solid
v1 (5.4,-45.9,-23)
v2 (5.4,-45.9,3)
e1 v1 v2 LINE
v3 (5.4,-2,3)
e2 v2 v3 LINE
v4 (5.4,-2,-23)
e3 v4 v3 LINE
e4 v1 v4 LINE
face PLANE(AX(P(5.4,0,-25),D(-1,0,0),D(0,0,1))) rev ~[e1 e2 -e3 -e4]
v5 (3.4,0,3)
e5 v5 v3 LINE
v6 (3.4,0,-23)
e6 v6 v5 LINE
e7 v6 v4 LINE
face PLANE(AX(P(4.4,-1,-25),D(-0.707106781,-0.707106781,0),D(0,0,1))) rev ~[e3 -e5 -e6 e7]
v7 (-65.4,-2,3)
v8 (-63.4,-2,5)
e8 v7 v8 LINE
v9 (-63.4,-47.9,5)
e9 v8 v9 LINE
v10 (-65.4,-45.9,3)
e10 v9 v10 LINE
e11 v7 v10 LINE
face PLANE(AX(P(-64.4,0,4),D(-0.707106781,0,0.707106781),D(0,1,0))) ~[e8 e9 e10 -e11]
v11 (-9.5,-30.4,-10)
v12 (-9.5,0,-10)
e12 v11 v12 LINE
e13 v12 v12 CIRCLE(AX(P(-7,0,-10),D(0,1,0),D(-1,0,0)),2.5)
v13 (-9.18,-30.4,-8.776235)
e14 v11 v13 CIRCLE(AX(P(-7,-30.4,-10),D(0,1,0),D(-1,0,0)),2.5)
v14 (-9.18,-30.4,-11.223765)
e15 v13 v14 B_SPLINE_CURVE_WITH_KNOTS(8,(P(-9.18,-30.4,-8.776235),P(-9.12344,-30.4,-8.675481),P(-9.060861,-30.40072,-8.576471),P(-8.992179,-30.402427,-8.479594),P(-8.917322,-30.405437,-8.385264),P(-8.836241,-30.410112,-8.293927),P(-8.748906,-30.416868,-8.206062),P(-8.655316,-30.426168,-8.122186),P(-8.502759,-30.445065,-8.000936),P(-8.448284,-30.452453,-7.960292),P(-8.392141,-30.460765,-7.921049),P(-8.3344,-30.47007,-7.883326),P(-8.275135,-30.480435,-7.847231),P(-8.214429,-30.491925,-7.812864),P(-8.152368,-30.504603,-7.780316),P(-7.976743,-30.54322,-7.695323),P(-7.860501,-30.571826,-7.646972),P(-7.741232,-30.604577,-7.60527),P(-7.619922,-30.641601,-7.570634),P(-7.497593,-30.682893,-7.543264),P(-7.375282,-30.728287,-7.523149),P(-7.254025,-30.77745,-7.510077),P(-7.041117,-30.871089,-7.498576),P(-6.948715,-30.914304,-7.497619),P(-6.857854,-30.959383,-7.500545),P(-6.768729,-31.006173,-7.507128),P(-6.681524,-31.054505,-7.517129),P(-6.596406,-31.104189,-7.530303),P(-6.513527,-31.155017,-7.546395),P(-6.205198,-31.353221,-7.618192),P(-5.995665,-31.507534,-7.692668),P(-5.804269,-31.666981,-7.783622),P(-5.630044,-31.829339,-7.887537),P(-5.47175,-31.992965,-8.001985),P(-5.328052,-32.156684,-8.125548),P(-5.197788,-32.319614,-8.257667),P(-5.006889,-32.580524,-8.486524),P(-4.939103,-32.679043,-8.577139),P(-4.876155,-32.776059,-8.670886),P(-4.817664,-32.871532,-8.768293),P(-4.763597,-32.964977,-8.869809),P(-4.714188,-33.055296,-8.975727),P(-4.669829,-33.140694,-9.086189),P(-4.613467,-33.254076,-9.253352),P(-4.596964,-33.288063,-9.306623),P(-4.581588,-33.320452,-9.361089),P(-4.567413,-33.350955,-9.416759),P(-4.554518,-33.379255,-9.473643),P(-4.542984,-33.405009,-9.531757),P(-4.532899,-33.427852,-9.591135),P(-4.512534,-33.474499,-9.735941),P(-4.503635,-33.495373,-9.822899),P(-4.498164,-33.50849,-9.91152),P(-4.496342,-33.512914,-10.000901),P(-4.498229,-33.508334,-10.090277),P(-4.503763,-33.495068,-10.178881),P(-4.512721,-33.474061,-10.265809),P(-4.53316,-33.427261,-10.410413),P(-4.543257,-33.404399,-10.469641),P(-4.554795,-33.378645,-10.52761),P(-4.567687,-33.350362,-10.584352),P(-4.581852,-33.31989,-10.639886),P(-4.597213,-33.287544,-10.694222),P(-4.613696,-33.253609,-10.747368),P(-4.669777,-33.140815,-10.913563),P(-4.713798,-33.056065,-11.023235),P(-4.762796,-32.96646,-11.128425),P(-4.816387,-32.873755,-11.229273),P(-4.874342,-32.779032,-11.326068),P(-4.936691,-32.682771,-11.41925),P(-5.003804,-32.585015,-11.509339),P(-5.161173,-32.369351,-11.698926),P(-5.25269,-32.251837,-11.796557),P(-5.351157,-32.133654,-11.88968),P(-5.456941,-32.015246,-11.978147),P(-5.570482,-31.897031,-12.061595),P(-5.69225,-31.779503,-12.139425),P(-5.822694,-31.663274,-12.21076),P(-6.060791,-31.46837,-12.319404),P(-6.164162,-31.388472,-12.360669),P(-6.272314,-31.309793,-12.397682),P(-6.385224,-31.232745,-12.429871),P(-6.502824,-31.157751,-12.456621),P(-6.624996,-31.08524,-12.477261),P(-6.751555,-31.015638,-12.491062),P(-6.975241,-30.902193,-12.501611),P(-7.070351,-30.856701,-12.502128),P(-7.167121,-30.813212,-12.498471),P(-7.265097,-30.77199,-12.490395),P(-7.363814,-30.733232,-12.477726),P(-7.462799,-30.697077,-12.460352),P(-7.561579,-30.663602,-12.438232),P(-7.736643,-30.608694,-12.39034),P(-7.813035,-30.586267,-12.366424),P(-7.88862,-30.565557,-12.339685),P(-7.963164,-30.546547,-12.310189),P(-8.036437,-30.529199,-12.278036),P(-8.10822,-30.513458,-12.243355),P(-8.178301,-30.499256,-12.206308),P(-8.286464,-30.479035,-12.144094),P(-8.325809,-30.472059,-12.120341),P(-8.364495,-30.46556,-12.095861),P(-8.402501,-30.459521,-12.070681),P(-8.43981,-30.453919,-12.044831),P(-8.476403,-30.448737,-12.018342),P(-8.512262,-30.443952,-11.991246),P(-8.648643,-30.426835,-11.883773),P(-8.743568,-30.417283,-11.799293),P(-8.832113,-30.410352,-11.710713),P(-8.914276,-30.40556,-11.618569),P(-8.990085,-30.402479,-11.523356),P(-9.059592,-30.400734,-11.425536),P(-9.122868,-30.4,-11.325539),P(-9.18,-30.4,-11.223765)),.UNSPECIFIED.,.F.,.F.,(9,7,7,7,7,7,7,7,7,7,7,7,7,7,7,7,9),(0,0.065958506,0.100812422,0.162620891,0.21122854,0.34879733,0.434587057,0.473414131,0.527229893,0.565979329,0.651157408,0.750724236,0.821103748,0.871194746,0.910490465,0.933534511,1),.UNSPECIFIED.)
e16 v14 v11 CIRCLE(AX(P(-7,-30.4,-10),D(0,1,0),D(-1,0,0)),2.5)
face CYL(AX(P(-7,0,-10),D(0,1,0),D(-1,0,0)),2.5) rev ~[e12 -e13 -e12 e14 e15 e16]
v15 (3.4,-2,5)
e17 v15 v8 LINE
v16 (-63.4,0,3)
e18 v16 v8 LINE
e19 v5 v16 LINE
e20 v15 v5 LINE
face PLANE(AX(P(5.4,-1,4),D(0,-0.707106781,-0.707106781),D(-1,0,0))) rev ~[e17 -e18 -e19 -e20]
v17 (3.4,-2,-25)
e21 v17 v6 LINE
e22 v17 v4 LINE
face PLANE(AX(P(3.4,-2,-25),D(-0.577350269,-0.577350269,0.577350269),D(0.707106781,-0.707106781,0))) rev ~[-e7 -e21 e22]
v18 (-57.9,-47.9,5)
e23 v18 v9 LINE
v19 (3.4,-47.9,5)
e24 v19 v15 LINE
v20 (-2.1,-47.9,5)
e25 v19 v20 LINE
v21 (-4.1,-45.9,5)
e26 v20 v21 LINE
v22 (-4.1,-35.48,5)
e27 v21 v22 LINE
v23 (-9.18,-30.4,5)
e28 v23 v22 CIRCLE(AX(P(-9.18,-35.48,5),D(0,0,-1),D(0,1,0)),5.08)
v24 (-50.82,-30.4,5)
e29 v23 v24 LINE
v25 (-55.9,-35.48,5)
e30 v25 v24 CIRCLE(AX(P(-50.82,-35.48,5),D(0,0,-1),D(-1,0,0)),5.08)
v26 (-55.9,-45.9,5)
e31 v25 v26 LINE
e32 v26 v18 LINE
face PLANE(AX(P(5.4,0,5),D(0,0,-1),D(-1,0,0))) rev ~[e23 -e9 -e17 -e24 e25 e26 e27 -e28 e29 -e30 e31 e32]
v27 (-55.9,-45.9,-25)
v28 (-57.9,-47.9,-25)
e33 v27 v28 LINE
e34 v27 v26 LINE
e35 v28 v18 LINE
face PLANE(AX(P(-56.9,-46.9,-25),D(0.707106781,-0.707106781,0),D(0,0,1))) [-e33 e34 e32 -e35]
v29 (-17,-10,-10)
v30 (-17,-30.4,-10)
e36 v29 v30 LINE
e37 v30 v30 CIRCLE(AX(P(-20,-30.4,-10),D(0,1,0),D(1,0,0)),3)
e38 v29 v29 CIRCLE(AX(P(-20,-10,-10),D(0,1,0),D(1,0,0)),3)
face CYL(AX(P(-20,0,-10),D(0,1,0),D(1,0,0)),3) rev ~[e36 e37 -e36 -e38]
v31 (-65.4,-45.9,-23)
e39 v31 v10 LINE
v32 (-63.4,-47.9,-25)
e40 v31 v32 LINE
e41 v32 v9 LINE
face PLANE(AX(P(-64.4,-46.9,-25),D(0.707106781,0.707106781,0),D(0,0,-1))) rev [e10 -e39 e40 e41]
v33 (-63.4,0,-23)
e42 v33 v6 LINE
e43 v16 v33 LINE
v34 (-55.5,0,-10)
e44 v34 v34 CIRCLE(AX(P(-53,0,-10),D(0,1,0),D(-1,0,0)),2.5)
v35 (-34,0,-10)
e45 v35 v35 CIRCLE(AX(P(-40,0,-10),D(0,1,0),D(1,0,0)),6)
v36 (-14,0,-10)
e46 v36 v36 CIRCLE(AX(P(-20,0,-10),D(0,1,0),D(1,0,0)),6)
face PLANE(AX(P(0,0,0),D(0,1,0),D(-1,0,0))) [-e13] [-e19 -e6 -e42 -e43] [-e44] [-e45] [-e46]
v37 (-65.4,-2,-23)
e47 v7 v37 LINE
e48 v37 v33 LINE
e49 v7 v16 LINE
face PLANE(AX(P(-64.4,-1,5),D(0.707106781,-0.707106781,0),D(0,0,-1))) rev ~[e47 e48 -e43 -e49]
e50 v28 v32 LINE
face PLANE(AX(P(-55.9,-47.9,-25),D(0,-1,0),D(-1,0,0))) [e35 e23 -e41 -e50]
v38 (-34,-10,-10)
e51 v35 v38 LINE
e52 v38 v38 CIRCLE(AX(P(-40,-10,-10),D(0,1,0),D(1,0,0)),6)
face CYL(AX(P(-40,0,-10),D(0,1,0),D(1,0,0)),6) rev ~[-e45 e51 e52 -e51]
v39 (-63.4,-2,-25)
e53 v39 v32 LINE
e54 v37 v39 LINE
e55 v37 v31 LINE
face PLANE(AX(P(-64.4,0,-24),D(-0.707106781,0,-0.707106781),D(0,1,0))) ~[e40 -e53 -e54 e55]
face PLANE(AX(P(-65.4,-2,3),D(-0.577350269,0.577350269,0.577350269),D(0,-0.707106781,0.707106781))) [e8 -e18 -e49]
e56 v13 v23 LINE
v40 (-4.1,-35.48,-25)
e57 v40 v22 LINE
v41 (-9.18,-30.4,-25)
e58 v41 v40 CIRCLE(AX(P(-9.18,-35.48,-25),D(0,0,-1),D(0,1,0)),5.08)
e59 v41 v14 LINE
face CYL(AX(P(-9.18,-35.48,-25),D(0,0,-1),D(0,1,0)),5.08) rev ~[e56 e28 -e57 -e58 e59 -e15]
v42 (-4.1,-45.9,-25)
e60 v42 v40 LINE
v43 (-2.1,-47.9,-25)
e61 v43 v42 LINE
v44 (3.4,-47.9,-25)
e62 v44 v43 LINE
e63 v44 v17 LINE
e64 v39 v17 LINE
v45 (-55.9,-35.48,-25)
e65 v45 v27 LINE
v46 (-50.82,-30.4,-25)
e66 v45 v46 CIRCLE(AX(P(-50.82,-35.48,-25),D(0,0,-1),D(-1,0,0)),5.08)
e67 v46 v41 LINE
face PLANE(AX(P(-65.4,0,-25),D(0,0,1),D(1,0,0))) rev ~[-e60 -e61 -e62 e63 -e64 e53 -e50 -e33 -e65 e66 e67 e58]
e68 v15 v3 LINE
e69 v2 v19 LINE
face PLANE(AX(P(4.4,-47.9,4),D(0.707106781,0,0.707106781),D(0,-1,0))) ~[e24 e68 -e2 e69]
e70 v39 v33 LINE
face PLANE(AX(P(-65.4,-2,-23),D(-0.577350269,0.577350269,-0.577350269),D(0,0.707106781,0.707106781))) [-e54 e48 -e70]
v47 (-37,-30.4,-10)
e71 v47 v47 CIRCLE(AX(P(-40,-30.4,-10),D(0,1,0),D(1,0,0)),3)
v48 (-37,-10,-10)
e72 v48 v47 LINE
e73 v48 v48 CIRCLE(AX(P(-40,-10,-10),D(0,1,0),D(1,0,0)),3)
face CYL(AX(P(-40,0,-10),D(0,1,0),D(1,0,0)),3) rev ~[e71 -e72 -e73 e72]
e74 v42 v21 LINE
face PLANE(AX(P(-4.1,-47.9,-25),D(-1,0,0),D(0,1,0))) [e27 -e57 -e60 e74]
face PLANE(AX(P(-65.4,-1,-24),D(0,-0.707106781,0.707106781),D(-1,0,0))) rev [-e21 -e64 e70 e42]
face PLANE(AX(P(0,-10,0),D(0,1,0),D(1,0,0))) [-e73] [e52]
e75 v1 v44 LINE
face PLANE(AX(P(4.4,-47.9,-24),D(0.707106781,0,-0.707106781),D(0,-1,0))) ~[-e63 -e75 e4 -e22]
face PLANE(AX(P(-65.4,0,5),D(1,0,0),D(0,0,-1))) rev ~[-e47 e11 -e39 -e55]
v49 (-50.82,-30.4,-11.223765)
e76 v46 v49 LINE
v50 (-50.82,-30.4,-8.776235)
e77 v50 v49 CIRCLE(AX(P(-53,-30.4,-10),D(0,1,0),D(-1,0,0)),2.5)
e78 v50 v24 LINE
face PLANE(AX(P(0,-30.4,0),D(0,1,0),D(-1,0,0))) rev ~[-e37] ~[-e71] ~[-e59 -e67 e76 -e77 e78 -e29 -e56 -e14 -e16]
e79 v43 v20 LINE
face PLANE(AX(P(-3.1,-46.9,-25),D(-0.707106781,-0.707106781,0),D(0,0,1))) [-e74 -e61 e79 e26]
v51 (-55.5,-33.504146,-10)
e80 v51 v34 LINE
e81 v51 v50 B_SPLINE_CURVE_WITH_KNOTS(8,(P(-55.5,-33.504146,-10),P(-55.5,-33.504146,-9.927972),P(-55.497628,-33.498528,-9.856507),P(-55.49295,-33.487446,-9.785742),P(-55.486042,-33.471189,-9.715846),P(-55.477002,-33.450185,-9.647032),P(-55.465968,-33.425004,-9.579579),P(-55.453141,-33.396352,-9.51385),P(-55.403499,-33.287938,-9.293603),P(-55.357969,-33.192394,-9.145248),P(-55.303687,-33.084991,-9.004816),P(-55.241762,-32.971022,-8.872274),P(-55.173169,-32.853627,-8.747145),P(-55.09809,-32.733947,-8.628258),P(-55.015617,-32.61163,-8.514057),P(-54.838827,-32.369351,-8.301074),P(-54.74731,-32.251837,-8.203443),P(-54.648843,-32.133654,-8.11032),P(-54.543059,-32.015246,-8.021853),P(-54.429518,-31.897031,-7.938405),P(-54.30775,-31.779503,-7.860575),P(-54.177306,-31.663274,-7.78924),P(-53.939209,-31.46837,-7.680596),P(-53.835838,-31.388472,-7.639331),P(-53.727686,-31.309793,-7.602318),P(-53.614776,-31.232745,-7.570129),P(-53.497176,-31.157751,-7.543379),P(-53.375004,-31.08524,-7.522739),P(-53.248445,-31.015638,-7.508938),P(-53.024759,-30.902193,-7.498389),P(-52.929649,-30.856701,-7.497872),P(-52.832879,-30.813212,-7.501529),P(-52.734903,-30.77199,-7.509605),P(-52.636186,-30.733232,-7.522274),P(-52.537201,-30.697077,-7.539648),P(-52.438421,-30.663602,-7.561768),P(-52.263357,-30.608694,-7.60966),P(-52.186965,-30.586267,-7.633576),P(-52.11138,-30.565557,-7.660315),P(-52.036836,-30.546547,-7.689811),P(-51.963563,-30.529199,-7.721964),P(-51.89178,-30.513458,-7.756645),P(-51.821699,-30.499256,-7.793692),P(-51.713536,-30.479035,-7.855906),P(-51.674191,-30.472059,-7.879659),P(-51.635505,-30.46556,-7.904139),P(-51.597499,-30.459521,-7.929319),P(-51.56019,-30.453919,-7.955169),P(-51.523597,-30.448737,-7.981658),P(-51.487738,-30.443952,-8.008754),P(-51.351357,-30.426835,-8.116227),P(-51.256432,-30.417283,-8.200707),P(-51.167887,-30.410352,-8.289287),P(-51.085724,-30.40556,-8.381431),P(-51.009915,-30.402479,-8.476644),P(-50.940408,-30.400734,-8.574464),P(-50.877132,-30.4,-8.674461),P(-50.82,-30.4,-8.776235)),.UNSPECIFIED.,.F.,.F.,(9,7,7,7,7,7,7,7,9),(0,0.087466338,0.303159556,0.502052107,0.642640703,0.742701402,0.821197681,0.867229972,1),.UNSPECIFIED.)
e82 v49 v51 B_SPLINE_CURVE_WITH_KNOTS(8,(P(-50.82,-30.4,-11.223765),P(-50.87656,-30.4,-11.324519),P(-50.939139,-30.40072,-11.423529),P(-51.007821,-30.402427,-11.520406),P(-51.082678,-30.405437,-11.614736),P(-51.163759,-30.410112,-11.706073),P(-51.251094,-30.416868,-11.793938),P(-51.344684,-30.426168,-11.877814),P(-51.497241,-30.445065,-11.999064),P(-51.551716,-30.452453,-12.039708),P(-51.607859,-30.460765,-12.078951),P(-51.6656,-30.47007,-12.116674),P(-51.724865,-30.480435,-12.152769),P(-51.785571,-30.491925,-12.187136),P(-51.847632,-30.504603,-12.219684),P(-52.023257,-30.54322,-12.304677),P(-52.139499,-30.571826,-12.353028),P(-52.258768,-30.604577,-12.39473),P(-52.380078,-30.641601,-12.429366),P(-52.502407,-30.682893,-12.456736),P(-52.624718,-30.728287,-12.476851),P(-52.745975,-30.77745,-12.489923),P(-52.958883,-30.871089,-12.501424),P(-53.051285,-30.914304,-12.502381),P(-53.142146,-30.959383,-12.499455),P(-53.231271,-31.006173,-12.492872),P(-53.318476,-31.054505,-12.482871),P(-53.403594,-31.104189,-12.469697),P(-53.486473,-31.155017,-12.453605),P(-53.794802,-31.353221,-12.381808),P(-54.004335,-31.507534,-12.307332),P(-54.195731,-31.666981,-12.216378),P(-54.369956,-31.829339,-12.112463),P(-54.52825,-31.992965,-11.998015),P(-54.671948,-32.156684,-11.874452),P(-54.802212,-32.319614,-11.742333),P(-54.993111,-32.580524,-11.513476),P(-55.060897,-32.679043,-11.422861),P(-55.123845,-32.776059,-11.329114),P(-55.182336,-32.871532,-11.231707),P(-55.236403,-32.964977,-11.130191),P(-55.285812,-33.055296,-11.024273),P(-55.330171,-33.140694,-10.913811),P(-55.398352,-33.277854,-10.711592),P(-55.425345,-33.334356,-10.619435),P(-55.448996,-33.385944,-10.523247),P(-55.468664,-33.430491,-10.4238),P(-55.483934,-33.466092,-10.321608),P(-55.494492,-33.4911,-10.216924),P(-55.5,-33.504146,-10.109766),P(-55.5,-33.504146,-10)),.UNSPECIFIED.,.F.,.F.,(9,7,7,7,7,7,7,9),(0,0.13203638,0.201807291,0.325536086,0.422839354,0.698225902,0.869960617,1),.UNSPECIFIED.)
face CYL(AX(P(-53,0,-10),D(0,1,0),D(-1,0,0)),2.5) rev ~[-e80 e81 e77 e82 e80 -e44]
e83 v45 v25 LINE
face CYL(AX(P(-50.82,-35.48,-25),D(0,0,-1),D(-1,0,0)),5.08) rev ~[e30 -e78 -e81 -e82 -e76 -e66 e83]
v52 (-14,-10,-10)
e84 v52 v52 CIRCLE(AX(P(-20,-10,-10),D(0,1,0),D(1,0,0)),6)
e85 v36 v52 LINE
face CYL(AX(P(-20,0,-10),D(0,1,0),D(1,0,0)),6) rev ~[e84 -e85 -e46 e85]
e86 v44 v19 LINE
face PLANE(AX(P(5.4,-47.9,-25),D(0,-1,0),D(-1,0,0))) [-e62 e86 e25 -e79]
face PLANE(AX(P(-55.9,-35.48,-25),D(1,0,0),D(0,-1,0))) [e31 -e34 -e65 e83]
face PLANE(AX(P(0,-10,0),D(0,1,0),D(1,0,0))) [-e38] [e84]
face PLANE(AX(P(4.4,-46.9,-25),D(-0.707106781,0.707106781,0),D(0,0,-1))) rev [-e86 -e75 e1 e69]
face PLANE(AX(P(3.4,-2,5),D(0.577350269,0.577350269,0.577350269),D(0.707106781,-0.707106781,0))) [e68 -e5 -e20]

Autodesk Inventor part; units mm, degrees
ref_plane "YZ Plane" through (0, 0, 0) normal (1, 0, 0) x (0, 1, 0)
ref_plane "XZ Plane" through (0, 0, 0) normal (0, 1, 0) x (-1, 0, 0)
sketch "Sketch1" plane through (0, 0, 0) normal (0, 1, 0) x (-1, 0, 0)
  line L0 (0, 0) -> (60, 0) construction
  line L1 (60, 0) -> (60, -20) construction
  line L2 (60, -20) -> (0, -20) construction
  line L3 (0, -20) -> (0, 0) construction
  line L4 (60.5, 0.5) -> (-0.5, 0.5)
  line L5 (-0.5, 0.5) -> (-0.5, -20.5)
  line L6 (-0.5, -20.5) -> (60.5, -20.5)
  line L7 (60.5, -20.5) -> (60.5, 0.5)
  circle A0 centre (53, -10) radius 2.5
  circle A1 centre (7, -10) radius 2.5
  line L8 (53, -10) -> (7, -10) construction
  point P0 (30, -10)
  point P1 (30, -20)
  point P2 (0, -10)
  dimension "d0" = 20
  dimension "d1" = 60
  dimension "d2" = 0.5
  dimension "d3" = 0.5
  dimension "d4" = 0.5
  dimension "d5" = 0.5
  dimension "d6" = 5
  dimension "d7" = 46
sketch "Sketch2" plane through (0, 0, 0) normal (0, 1, 0) x (-1, 0, 0)
  line L0 (-5.4, 5) -> (65.4, 5)
  line L1 (65.4, 5) -> (65.4, -25)
  line L2 (65.4, -25) -> (-5.4, -25)
  line L3 (-5.4, -25) -> (-5.4, 5)
  line L4 (60.5, -20.5) -> (60.5, 0.5) construction
  line L5 (-0.5, 0.5) -> (-0.5, -20.5) construction
  line L6 (-0.5, -20.5) -> (60.5, -20.5) construction
  point P0 (0, 0)
  point P1 (60.5, -10)
  point P2 (65.4, -10)
  point P3 (30, -20.5)
  point P4 (30, -25)
  dimension "d9" = 70.8
  dimension "d10" = 30
  dimension "d44" = 35.4
extrude "Extrusion1" add sketch "Sketch2" against normal blind 30.4
extrude "Extrusion3" cut sketch "Sketch1" against normal blind 43.3375 and the other way blind 30.4 contours A0 | A1
sketch "Sketch3" plane through (5.4, -30.4, -25) normal (0, 0, -1) x (1, 0, 0)
  line L0 (-70.8, 0) -> (0, 0) projected
  line L1 (0, 0) -> (0, 17.5)
  line L2 (0, 17.5) -> (-9.5, 17.5)
  line L3 (-9.5, 17.5) -> (-9.5, 5.08)
  line L4 (-14.58, 0) -> (-56.22, 0)
  line L5 (-61.3, 5.08) -> (-61.3, 17.5)
  line L6 (-61.3, 17.5) -> (-70.8, 17.5)
  line L7 (-70.8, 17.5) -> (-70.8, 0)
  arc A0 (-14.58, 0) -> (-9.5, 5.08) centre (-14.58, 5.08) ccw
  arc A1 (-61.3, 5.08) -> (-56.22, 0) centre (-56.22, 5.08) ccw
  point P0 (-9.5, 0)
  point P1 (-61.3, 0)
  point P2 (-61.3, 11.29)
  point P3 (-9.5, 11.29)
  point P4 (-4.75, 17.5)
  dimension "d94" = 51.8
  dimension "d95" = 17.5
  dimension "d96" = 5.08
extrude "Extrusion4" add sketch "Sketch3" against normal up to surface (30 mm away)
ref_plane "Work Plane3" through (-49.05, -33.575, -1214.2) normal (0, -1, 0) x (1, 0, 0)
sketch "Sketch4" plane through (0, 0, 0) normal (0, 1, 0) x (1, 0, 0)
  line L0 (-60.5, 20.5) -> (0.5, 20.5) construction
  line L1 (-60.5, -0.5) -> (-60.5, 20.5) construction
  circle A0 centre (-40, 10) radius 3
  line L2 (5.4, 25) -> (-65.4, 25) projected
  line L3 (-65.4, 25) -> (-65.4, -5) projected
  circle A1 centre (-20, 10) radius 3
  line L4 (-40, 10) -> (-20, 10) construction
  point P0 (0, 0)
  point P1 (-30, 20.5)
  point P2 (-60.5, 10)
  point P3 (-65.4, 20.5)
  point P4 (5.4, 20.5)
  point P5 (-30, 20.5)
  point P6 (-60.5, 10)
  point P7 (-65.4, 10)
  point P8 (-30, 25)
  point P9 (-30, 10)
  dimension "d82" = 6
  dimension "d98" = 20
extrude "Extrusion5" cut sketch "Sketch4" against normal up to surface (33.575 mm away)
extrude "Extrusion2" cut sketch "Sketch1" against normal blind 43.3375 and the other way blind 5 contours A0 | A1
sketch "Sketch8" plane through (15.4, 40, -25) normal (0, 0, -1) x (1, 0, 0)
  line L0 (25.4, 30) -> (34.4, 30)
  line L1 (34.4, 30) -> (35.4, 31)
  line L2 (35.4, 31) -> (35.4, 34)
  line L3 (35.4, 34) -> (31.95, 37.45)
  line L4 (31.95, 37.45) -> (31.95, 39.8767)
  line L5 (31.95, 39.8767) -> (33.1672, 41.0939)
  arc A0 (34.8792, 42.8058) -> (33.1672, 41.0939) centre (35.1489, 40.8241) ccw
  line L6 (34.8792, 42.8058) -> (35.4, 43.3267)
  line L7 (35.4, 43.3267) -> (35.4, 44.66)
  line L8 (35.4, 44.66) -> (34.8792, 45.1808)
  arc A1 (33.1672, 46.8928) -> (34.8792, 45.1808) centre (35.1489, 47.1626) ccw
  line L9 (33.1672, 46.8928) -> (32.56, 47.5)
  line L10 (32.56, 47.5) -> (25.4, 47.5)
  line L11 (25.4, 47.5) -> (25.4, 30) construction
  line L12 (33.1672, 41.0939) -> (34.8792, 42.8058) construction
  line L13 (33.1672, 46.8928) -> (34.8792, 45.1808) construction
  line L14 (25.4, 30) -> (16.4, 30)
  line L15 (16.4, 30) -> (15.4, 31)
  line L16 (15.4, 31) -> (15.4, 34)
  line L17 (15.4, 34) -> (18.85, 37.45)
  line L18 (18.85, 37.45) -> (18.85, 39.8767)
  line L19 (18.85, 39.8767) -> (17.6328, 41.0939)
  arc A2 (17.6328, 41.0939) -> (15.9208, 42.8058) centre (15.6511, 40.8241) ccw
  line L20 (15.9208, 42.8058) -> (15.4, 43.3267)
  line L21 (15.4, 43.3267) -> (15.4, 44.66)
  line L22 (15.4, 44.66) -> (15.9208, 45.1808)
  arc A3 (15.9208, 45.1808) -> (17.6328, 46.8928) centre (15.6511, 47.1626) ccw
  line L23 (17.6328, 46.8928) -> (18.24, 47.5)
  line L24 (18.24, 47.5) -> (25.4, 47.5)
  line L25 (17.6328, 41.0939) -> (15.9208, 42.8058) construction
  line L26 (17.6328, 46.8928) -> (15.9208, 45.1808) construction
  arc A4 (50.8, 26.825) -> (47.625, 30) centre (47.625, 26.825) ccw construction
  line L27 (34.4, 30) -> (35.4, 30)
  line L28 (3.175, 30) -> (47.625, 30) projected
  line L29 (35.4, 31) -> (35.4, 30)
  line L30 (15.4, 31) -> (15.4, 30)
  line L31 (15.4, 30) -> (16.4, 30)
  point P0 (-15.4, 40)
  point P1 (35.4, 32.5)
  dimension "d64" = 1
  dimension "d65" = 3
  dimension "d66" = 135
  dimension "d67" = 2
  dimension "d69" = 3.45
  dimension "d71" = 17.5
  dimension "d72" = 7.16
  dimension "d73" = 2.375
  dimension "d74" = 1.3333
  dimension "d75" = 2.4211
  dimension "d76" = 15.4
  dimension "d77" = 10
extrude "Extrusion8" [suppressed]
thicken "Thicken1" [suppressed]
sketch "Sketch11" plane through (0, 0, 0) normal (0, 1, 0) x (1, 0, 0)
  circle A0 centre (-20, 10) radius 6
  circle A1 centre (-40, 10) radius 3 projected
  circle A2 centre (-20, 10) radius 3 projected
  circle A3 centre (-40, 10) radius 6
  point P0 (0, 0)
  dimension "d99" = 12
extrude "Extrusion11" cut sketch "Sketch11" against normal blind 10 contours A0 | A1 | A2 | A3
chamfer "Chamfer1" distance 2 angle 45 12 edges at (5.4, 0, -10) (-30, 0, -25) (5.4, -23.95, -25) (-65.4, -23.95, -25) (-55.9, -47.9, -10) (5.4, -47.9, -10) (-30, 0, 5) (-65.4, 0, -10) (-65.4, -23.95, 5) (-65.4, -47.9, -10) (-4.1, -47.9, -10) (5.4, -23.95, 5)
properties part number "BK12_Spacer"
